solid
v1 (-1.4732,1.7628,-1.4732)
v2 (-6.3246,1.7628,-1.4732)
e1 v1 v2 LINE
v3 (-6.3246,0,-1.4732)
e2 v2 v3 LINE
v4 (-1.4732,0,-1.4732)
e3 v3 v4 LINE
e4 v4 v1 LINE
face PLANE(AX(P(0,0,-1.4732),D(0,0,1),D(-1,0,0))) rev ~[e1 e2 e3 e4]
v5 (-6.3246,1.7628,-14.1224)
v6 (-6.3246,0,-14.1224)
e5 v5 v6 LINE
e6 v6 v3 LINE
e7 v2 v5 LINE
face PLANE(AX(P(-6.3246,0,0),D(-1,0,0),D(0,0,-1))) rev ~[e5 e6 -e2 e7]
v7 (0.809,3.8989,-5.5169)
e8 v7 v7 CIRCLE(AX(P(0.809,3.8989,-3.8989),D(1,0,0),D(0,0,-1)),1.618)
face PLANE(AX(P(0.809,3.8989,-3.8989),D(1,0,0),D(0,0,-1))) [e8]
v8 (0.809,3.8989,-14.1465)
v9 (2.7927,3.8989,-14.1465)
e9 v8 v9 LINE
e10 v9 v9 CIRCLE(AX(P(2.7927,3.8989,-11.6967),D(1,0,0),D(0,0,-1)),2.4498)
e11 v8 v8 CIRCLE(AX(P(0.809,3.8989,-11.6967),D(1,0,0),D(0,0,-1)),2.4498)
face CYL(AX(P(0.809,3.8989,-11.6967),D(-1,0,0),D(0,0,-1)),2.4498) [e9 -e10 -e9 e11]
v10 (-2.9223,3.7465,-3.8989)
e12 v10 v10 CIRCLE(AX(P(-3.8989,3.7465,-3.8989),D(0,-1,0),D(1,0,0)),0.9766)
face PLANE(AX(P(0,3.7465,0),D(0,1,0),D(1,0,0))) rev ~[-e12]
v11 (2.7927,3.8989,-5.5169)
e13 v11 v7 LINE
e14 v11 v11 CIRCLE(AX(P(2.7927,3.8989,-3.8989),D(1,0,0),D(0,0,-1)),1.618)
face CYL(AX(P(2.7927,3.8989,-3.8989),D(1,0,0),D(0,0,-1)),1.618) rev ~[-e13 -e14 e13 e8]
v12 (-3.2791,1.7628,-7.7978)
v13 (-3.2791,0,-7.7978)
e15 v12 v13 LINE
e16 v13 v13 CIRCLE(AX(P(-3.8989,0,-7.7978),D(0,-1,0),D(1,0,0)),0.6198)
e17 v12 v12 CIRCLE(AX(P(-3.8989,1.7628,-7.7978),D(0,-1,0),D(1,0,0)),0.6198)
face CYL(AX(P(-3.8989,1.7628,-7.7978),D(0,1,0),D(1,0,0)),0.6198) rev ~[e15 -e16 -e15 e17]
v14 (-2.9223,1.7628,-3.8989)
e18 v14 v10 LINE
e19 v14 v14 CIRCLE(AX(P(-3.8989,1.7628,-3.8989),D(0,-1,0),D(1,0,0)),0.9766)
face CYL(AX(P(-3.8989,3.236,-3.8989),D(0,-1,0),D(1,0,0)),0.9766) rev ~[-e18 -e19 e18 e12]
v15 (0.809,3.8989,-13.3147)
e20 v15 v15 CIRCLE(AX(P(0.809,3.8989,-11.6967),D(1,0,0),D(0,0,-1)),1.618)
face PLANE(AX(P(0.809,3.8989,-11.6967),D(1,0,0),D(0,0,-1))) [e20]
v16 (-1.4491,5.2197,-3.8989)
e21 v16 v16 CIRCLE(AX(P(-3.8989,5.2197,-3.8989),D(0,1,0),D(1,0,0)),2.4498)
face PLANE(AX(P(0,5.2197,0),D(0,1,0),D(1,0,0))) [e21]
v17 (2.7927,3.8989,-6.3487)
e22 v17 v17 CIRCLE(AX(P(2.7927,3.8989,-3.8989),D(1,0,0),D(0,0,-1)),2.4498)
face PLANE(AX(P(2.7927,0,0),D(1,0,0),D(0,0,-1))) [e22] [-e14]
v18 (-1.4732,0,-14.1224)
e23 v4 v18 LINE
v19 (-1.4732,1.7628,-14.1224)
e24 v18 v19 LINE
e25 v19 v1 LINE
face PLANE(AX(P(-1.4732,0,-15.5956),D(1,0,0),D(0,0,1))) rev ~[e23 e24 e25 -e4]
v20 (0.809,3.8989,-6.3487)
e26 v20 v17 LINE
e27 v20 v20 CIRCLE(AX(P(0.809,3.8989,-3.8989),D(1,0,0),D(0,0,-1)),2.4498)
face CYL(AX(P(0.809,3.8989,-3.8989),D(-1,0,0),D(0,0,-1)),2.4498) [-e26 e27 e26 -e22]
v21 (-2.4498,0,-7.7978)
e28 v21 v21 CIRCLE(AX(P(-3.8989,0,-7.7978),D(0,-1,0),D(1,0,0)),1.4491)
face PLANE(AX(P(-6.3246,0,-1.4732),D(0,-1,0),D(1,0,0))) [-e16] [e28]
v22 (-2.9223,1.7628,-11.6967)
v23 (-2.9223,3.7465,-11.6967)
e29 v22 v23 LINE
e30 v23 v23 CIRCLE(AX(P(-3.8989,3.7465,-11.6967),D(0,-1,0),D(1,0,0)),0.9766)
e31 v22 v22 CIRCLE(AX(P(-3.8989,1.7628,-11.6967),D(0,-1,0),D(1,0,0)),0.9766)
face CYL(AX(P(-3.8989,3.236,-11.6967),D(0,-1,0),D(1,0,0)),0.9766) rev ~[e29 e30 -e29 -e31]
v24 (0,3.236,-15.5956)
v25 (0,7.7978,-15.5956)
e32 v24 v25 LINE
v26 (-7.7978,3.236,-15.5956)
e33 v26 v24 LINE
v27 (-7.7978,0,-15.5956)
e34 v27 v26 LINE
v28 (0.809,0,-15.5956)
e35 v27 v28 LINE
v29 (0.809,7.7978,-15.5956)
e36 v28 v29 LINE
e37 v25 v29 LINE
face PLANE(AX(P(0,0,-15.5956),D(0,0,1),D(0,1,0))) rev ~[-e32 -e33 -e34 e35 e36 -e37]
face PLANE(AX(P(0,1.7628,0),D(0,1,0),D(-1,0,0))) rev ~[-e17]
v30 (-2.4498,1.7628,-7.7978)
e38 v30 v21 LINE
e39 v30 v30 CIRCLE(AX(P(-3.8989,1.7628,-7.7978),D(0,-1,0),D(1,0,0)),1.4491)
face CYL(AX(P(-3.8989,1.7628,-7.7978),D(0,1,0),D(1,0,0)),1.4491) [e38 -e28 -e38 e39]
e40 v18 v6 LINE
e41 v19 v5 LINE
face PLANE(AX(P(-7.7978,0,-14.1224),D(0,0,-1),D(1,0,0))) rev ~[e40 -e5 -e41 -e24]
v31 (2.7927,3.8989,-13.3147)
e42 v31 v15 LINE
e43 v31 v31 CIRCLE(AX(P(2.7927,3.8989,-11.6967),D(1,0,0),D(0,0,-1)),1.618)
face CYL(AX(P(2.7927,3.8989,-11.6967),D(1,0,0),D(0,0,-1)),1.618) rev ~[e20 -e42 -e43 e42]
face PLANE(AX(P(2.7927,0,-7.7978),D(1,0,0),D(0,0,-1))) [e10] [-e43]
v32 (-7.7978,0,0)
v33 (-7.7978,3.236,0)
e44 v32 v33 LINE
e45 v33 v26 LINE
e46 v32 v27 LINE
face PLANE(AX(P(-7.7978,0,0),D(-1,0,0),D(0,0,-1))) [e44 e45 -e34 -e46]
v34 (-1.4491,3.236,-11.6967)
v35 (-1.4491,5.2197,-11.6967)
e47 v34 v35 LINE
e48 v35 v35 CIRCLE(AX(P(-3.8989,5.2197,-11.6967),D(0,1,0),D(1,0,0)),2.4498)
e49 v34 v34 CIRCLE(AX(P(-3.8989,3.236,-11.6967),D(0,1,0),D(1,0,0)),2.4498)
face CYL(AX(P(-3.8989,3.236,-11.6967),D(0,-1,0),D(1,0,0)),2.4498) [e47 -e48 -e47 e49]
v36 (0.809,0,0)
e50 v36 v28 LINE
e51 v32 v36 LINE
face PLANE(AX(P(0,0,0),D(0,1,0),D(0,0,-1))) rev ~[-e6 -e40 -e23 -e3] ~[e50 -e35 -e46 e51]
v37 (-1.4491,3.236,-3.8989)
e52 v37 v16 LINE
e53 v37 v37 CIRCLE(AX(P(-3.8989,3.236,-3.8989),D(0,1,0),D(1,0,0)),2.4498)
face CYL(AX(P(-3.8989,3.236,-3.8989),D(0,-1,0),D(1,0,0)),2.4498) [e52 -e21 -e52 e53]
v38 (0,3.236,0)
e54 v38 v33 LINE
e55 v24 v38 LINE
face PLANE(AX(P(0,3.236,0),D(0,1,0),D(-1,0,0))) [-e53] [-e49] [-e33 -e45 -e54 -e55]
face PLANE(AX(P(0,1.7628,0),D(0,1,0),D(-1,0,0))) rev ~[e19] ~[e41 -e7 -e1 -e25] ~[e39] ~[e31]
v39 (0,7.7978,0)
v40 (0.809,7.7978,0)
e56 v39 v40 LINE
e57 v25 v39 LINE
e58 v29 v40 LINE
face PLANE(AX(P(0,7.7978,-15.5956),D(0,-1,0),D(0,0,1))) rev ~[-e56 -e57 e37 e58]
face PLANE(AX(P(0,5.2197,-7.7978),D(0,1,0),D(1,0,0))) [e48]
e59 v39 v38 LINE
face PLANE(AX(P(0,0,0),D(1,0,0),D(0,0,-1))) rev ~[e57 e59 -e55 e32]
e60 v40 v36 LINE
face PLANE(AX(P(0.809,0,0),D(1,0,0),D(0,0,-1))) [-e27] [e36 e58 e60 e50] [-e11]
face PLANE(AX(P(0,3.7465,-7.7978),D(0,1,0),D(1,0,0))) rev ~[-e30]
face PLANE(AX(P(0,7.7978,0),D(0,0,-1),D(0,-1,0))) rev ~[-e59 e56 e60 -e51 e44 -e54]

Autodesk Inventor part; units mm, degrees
ref_plane "YZ Plane" through (0, 0, 0) normal (1, 0, 0) x (0, 1, 0)
ref_plane "XZ Plane" through (0, 0, 0) normal (0, 1, 0) x (-1, 0, 0)
ref_plane "XY Plane" through (0, 0, 0) normal (0, 0, 1) x (1, 0, 0)
sketch "Sketch1" plane through (0, 0, 0) normal (0, 1, 0) x (-1, 0, 0)
  line L0 (0, 0) -> (7.7978, 0)
  line L1 (7.7978, 0) -> (7.7978, -15.5956)
  line L2 (7.7978, -15.5956) -> (0, -15.5956)
  line L3 (0, -15.5956) -> (0, 0)
  dimension "d0" = 7.7978
  dimension "d8" = 15.5956
extrude "Extrusion1" add sketch "Sketch1" along normal blind 3.236
sketch "Sketch2" plane through (0, 3.236, 0) normal (0, 1, 0) x (1, 0, 0)
  line L0 (0, 0) -> (0, 15.5956) construction
  line L1 (0, 0) -> (-3.8989, 0) construction
  line L2 (-3.8989, 0) -> (-3.8989, 3.8989) construction
  line L3 (-3.8989, 3.8989) -> (0, 3.8989) construction
  line L4 (0, 3.8989) -> (0, 0) construction
  circle A0 centre (-3.8989, 3.8989) radius 2.4498
  dimension "d11" = 3.8989
  dimension "d12" = 3.8989
  dimension "d13" = 4.8997
extrude "Extrusion2" add sketch "Sketch2" along normal blind 1.9837
pattern_linear "Rectangular Pattern1" count 2 spacing 7.7978 along (0, 0, -1) of "Extrusion2"
shell "Shell1" thickness 1.4732 removed faces 1 at (-2.5993, 0, -5.1985)
sketch "Sketch3" plane through (-6.3246, 1.7628, -1.4732) normal (0, -1, 0) x (1, 0, 0)
  circle A0 centre (2.4257, -2.4257) radius 2.4498 construction
  circle A1 centre (2.4257, -10.2235) radius 2.4498 construction
  circle A2 centre (2.4257, -2.4257) radius 0.9766 construction
  line L0 (2.4257, -2.4257) -> (2.4257, -10.2235) construction
  circle A3 centre (2.4257, -6.3246) radius 1.4491
  circle A4 centre (2.4257, -6.3246) radius 0.6198
  point P0 (6.3246, 1.4732)
  dimension "d20" = 1.2395
extrude "Extrusion3" add sketch "Sketch3" along normal up to surface (1.7628 mm away)
sketch "Sketch4" plane through (0, 0, 0) normal (1, 0, 0) x (0, 0, -1)
  line L0 (0, 0) -> (15.5956, 0)
  line L1 (15.5956, 0) -> (15.5956, 7.7978)
  line L2 (15.5956, 7.7978) -> (0, 7.7978)
  line L3 (0, 7.7978) -> (0, 0)
  dimension "d23" = 15.5956
  dimension "d24" = 7.7978
extrude "Extrusion4" add sketch "Sketch4" along normal blind 0.809
sketch "Sketch5" plane through (0.809, 0, 0) normal (1, 0, 0) x (0, 0, -1)
  line L0 (0, 0) -> (15.5956, 0) construction
  line L1 (0, 0) -> (3.8989, 0) construction
  line L2 (3.8989, 0) -> (3.8989, 3.8989) construction
  line L3 (3.8989, 3.8989) -> (0, 3.8989) construction
  line L4 (0, 3.8989) -> (0, 0) construction
  circle A0 centre (3.8989, 3.8989) radius 2.4498
  dimension "d27" = 3.8989
  dimension "d28" = 3.8989
  dimension "d29" = 4.8997
extrude "Extrusion5" add sketch "Sketch5" along normal blind 1.9837
sketch "Sketch6" plane through (2.7927, 3.8989, -3.8989) normal (1, 0, 0) x (0, 0, -1)
  circle A0 centre (0, 0) radius 2.4498 construction
  circle A1 centre (0, 0) radius 1.618
  point P0 (-3.8989, -3.8989)
  dimension "d32" = 3.236
extrude "Extrusion6" cut sketch "Sketch6" against normal blind 1.9837
pattern_linear "Rectangular Pattern2" count 2 spacing 7.7978 along (0, 0, -1) of "Extrusion6", "Extrusion5"
equation "\"d0\" = d1"
equation "\"d8\" = 2 * d1"
equation "\"d9\" = d2"
equation "\"d11\" = 0.5 * d1"
equation "\"d12\" = 0.5 * d1"
equation "\"d13\" = d4"
equation "\"d14\" = d5"
equation "\"d18\" = d1"
equation "\"d19\" = d6"
equation "\"d20\" = d7"
equation "\"d21\" = d5"
equation "\"d23\" = 2 * d1"
equation "\"d24\" = d1"
equation "\"d25\" = 0.25 * d2"
equation "\"d27\" = 0.5 * d1"
equation "\"d28\" = 0.5 * d1"
equation "\"d29\" = d4"
equation "\"d30\" = d5"
equation "\"d32\" = d2"
equation "\"d33\" = d5"
equation "\"d37\" = d1"
equation "\"d1\" = 7.7978"
equation "\"d2\" = 3.23596"
equation "\"d3\" = 9.60882"
equation "\"d4\" = 4.89966"
equation "\"d5\" = 1.98374"
equation "\"d6\" = 1.4732"
equation "\"d7\" = 1.23952"
properties part number "Two Sided Piece" material "ABS Plastic"
